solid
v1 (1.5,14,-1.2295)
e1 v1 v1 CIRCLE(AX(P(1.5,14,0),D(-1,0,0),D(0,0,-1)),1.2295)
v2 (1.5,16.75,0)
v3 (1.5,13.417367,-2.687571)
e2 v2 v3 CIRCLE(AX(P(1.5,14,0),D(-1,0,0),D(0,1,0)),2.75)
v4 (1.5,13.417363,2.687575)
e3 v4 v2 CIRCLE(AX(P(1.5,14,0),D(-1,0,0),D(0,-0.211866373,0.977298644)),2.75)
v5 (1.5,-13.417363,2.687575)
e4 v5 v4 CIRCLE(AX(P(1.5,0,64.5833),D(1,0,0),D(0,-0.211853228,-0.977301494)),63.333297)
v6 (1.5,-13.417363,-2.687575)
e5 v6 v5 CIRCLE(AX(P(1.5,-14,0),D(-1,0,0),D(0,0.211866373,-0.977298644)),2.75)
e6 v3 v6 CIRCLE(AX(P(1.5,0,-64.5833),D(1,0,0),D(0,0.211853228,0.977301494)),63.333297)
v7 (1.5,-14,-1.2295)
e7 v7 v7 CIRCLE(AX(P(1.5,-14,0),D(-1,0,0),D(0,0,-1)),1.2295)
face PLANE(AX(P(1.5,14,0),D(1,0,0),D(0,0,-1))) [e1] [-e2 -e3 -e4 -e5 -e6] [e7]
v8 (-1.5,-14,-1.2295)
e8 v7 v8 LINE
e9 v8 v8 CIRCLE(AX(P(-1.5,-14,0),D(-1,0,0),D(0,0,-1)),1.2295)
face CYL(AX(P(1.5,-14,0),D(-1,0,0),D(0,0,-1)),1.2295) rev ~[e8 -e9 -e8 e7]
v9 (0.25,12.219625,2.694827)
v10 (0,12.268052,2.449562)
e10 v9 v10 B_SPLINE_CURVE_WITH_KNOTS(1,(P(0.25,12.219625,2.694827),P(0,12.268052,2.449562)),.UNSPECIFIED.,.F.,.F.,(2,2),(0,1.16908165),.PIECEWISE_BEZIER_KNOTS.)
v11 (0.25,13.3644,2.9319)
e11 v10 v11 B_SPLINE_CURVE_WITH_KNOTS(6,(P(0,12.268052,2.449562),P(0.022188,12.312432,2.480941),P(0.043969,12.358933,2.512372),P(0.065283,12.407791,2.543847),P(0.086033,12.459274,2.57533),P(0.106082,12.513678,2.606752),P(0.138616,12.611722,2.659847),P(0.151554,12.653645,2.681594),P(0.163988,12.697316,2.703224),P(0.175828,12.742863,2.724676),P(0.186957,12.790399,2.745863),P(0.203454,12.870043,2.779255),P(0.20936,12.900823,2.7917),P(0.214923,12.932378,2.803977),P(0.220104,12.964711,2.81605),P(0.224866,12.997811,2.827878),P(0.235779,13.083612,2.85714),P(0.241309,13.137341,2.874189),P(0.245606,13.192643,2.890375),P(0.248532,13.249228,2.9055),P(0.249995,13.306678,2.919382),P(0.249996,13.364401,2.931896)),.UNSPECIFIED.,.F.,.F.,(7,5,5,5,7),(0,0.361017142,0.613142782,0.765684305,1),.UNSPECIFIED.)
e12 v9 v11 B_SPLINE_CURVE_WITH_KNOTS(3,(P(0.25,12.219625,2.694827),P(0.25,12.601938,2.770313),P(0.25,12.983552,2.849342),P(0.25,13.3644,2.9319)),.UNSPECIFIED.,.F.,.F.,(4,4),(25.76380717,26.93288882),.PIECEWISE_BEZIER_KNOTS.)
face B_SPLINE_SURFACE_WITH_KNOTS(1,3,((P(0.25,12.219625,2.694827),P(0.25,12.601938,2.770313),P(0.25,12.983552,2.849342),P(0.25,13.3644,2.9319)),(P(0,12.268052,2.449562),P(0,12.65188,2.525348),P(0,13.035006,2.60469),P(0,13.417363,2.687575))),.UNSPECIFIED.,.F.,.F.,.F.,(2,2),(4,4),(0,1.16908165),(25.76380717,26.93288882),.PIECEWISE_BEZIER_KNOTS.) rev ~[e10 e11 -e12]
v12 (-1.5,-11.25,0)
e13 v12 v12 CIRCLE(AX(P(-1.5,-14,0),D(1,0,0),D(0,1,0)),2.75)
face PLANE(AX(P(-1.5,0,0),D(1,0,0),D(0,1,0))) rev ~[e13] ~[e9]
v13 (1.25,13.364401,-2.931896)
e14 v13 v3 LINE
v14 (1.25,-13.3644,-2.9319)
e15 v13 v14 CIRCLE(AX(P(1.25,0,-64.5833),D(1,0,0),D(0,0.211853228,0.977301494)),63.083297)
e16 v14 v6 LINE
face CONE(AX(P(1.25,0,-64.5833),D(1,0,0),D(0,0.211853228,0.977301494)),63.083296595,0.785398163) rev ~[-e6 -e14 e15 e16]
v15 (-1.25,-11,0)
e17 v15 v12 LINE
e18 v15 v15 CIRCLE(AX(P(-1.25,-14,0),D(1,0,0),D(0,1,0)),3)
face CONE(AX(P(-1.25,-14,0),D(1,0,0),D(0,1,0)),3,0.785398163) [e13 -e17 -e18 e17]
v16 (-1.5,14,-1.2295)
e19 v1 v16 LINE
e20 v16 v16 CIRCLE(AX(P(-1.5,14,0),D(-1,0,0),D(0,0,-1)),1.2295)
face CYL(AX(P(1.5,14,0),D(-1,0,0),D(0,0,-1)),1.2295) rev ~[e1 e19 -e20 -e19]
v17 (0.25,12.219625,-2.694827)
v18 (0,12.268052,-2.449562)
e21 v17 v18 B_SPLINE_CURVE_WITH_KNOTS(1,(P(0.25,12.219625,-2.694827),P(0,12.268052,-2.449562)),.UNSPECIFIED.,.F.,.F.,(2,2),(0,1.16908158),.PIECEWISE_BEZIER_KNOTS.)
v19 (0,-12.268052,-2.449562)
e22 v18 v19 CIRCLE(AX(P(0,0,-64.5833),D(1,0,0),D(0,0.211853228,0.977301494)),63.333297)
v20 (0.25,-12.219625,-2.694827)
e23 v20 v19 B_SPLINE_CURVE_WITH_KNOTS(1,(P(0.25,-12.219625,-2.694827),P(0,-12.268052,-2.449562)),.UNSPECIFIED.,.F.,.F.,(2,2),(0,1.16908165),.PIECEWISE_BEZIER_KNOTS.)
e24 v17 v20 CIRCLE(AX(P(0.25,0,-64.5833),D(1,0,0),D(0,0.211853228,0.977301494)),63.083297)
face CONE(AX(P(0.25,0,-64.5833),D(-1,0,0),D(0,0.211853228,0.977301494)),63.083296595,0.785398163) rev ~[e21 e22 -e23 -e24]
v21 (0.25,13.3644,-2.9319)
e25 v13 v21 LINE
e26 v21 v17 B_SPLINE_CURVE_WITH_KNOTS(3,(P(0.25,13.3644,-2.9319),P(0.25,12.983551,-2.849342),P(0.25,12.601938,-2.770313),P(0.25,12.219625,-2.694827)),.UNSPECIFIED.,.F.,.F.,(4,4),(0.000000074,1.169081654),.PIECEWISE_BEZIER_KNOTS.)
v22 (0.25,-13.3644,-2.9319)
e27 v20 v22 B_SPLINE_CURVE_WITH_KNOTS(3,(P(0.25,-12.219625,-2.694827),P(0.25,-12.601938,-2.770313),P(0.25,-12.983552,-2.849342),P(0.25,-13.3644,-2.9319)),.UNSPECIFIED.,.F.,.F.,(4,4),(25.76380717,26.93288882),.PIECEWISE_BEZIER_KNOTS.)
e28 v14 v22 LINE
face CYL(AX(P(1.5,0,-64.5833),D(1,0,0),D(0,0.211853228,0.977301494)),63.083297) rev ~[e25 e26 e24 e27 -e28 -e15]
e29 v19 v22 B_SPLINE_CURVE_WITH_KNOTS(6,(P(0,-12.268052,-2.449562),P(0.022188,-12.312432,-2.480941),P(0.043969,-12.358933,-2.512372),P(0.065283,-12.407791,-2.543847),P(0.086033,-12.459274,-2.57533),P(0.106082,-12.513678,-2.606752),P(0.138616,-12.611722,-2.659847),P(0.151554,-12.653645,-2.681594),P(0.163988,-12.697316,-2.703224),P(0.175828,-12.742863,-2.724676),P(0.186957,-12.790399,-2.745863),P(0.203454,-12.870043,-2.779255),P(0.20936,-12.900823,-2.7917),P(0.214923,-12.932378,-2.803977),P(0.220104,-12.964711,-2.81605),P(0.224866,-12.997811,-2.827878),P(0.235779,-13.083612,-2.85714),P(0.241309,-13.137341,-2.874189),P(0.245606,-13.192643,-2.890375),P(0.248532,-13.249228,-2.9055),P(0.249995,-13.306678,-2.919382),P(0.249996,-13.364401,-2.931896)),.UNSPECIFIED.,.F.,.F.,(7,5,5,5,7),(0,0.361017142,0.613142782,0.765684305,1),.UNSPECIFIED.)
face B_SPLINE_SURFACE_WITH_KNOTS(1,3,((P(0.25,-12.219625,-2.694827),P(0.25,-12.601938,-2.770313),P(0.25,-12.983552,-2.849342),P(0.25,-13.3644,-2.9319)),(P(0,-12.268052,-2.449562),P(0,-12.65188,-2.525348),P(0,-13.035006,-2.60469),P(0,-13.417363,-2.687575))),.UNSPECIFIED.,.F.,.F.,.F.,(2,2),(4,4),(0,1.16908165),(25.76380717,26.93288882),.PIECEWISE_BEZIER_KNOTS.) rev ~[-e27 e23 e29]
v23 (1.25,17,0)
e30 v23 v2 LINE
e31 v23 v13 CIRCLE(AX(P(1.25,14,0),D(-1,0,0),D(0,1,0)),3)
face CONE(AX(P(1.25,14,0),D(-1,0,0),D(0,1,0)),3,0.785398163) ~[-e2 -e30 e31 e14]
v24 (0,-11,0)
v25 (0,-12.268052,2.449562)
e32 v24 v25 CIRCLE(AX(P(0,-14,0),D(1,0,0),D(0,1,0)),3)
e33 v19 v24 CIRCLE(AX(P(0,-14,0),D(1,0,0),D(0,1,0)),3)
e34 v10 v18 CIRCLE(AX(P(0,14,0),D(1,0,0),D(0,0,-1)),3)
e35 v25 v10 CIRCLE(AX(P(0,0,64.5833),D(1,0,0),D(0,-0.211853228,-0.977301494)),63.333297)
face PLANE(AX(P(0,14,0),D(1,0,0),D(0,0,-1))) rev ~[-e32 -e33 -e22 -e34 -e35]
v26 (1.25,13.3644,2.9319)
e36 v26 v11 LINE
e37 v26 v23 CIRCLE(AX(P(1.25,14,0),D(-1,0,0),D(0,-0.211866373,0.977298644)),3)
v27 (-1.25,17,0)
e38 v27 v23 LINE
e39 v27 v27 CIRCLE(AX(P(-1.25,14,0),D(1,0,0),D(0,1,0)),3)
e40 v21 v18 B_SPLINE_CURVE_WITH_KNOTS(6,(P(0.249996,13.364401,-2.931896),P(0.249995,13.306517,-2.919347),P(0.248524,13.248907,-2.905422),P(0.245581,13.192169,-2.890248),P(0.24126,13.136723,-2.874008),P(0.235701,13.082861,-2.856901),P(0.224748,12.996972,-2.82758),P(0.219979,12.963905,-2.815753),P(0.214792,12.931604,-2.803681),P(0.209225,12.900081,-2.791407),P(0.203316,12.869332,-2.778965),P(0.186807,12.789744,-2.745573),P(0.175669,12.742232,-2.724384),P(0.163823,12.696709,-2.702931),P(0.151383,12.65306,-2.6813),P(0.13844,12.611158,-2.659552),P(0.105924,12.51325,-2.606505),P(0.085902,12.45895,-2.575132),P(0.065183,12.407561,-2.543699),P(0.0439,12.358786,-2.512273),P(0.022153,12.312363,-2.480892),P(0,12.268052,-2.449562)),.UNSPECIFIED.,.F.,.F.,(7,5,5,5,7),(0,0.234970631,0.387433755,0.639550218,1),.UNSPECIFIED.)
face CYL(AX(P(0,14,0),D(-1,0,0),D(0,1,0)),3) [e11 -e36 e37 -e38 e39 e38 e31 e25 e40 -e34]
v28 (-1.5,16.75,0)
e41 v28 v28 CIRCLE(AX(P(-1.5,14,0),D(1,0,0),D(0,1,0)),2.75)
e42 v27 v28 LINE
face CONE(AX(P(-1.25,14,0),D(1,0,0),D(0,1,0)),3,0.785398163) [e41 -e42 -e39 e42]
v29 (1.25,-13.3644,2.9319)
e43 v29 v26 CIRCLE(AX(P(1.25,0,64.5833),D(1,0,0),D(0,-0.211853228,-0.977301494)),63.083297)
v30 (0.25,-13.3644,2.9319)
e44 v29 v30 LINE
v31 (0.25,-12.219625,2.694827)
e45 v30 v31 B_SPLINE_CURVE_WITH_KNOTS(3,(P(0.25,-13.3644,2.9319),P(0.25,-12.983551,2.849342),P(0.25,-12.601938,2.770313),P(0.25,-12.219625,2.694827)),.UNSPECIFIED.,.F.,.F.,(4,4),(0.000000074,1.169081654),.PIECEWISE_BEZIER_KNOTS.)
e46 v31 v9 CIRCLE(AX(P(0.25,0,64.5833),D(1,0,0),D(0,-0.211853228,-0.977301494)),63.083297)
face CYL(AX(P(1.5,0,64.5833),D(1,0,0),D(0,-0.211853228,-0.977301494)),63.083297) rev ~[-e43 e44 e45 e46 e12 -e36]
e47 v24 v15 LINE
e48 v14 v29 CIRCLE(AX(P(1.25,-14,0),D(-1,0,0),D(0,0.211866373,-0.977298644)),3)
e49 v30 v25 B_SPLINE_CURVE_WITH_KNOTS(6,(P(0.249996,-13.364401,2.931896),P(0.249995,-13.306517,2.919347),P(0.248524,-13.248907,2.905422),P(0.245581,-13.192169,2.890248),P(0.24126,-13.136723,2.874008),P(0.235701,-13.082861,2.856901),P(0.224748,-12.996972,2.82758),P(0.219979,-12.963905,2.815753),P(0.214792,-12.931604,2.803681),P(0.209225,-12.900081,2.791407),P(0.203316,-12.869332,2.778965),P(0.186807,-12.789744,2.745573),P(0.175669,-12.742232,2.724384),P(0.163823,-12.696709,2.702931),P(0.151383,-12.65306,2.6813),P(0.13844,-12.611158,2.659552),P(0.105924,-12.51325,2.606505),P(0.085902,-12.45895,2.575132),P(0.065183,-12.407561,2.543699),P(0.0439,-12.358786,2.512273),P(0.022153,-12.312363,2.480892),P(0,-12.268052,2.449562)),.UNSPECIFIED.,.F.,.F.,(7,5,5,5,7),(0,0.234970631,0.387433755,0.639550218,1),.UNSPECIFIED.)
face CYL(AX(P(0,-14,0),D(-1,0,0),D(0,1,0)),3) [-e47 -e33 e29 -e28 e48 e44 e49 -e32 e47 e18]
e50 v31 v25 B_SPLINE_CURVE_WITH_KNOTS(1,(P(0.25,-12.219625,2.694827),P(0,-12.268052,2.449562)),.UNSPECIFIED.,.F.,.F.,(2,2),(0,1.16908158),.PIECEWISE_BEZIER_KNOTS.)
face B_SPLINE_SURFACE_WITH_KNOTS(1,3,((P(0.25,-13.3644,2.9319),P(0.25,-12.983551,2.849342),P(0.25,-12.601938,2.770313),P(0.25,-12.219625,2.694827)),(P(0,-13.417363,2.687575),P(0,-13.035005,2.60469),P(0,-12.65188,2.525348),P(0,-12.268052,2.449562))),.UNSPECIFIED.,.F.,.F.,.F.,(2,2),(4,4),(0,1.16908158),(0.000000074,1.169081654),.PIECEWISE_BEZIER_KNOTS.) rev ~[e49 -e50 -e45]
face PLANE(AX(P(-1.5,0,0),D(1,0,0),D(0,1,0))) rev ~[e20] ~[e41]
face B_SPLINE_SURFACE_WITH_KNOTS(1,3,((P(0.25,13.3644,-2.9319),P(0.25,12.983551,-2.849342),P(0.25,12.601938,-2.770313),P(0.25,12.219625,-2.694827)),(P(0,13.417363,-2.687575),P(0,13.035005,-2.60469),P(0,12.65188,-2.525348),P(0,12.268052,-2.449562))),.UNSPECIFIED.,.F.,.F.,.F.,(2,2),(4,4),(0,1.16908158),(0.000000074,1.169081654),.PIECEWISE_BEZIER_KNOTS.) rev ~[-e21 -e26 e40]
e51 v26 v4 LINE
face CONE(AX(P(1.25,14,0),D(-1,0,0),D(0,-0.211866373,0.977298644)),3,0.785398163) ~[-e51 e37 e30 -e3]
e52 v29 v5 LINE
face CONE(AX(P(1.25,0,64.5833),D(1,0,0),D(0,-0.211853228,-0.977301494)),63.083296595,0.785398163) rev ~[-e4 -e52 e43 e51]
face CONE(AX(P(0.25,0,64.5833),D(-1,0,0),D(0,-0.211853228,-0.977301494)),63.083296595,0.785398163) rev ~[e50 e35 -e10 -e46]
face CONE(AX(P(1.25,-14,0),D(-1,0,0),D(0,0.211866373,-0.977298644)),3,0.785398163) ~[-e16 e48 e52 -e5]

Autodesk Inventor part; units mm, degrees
ref_plane "YZ Plane" through (0, 0, 0) normal (1, 0, 0) x (0, 1, 0)
ref_plane "XZ Plane" through (0, 0, 0) normal (0, 1, 0) x (-1, 0, 0)
ref_plane "XY Plane" through (0, 0, 0) normal (0, 0, 1) x (1, 0, 0)
sketch "Sketch1" plane through (0, 0, 0) normal (1, 0, 0) x (0, 1, 0)
  circle A0 centre (-14, 0) radius 3
  circle A1 centre (14, 0) radius 3
  line L0 (-14, 0) -> (14, 0) construction
  point P0 (0, 0)
  point P1 (0, 0)
  dimension "d0" = 6
  dimension "d1" = 28
extrude "Extrusion1" add sketch "Sketch1" along normal mid plane 3
sketch "Sketch2" plane through (1.5, 14, 0) normal (1, 0, 0) x (0, 0, -1)
  circle A0 centre (0, -28) radius 3 projected
  circle A1 centre (0, 0) radius 3 projected
  circle A2 centre (0, -28) radius 3 projected
  arc A3 (-2.9319, -27.3644) -> (-2.9319, -0.6356) centre (-64.5833, -14) ccw
  arc A4 (2.9319, -0.6356) -> (2.9319, -27.3644) centre (64.5833, -14) ccw
  circle A5 centre (0, 0) radius 3 projected
  point P0 (0, -14)
  dimension "d4" = 3
extrude "Extrusion2" add sketch "Sketch2" against normal blind 1.5 contours A0 A3 A1 A4
sketch "Sketch3" plane through (1.5, 0, 0) normal (1, 0, 0) x (0, 0, -1)
  arc A0 (-2.9319, -13.3644) -> (2.9319, -13.3644) centre (0, -14) ccw projected
  arc A1 (2.9319, 13.3644) -> (2.9319, -13.3644) centre (64.5833, 0) ccw projected
  arc A2 (2.9319, 13.3644) -> (-2.9319, 13.3644) centre (0, 14) ccw projected
  arc A3 (-2.9319, -13.3644) -> (-2.9319, 13.3644) centre (-64.5833, 0) ccw projected
  point P0 (0, 0)
hole "Hole1" at (1.5, 14, 0) at (1.5, -14, 0) direction (-1, 0, 0) diameter 2.459 end through all thread size "M3x0.5" class "6H" standard "ANSI Metric M Profile"
chamfer "Chamfer1" distance 0.25 angle 45 9 edges at (1.5, 0, 1.5) (1.5, -17, 0) (1.5, 0, -1.5) (1.5, 15.8833, -2.3352) (1.5, 15.8833, 2.3352) (-1.5, 11, 0) (-1.5, -17, 0) (0, 0, -1.5) (0, 0, 1.5)
properties part number "Backplane_CenterNut" material "Aluminum"
